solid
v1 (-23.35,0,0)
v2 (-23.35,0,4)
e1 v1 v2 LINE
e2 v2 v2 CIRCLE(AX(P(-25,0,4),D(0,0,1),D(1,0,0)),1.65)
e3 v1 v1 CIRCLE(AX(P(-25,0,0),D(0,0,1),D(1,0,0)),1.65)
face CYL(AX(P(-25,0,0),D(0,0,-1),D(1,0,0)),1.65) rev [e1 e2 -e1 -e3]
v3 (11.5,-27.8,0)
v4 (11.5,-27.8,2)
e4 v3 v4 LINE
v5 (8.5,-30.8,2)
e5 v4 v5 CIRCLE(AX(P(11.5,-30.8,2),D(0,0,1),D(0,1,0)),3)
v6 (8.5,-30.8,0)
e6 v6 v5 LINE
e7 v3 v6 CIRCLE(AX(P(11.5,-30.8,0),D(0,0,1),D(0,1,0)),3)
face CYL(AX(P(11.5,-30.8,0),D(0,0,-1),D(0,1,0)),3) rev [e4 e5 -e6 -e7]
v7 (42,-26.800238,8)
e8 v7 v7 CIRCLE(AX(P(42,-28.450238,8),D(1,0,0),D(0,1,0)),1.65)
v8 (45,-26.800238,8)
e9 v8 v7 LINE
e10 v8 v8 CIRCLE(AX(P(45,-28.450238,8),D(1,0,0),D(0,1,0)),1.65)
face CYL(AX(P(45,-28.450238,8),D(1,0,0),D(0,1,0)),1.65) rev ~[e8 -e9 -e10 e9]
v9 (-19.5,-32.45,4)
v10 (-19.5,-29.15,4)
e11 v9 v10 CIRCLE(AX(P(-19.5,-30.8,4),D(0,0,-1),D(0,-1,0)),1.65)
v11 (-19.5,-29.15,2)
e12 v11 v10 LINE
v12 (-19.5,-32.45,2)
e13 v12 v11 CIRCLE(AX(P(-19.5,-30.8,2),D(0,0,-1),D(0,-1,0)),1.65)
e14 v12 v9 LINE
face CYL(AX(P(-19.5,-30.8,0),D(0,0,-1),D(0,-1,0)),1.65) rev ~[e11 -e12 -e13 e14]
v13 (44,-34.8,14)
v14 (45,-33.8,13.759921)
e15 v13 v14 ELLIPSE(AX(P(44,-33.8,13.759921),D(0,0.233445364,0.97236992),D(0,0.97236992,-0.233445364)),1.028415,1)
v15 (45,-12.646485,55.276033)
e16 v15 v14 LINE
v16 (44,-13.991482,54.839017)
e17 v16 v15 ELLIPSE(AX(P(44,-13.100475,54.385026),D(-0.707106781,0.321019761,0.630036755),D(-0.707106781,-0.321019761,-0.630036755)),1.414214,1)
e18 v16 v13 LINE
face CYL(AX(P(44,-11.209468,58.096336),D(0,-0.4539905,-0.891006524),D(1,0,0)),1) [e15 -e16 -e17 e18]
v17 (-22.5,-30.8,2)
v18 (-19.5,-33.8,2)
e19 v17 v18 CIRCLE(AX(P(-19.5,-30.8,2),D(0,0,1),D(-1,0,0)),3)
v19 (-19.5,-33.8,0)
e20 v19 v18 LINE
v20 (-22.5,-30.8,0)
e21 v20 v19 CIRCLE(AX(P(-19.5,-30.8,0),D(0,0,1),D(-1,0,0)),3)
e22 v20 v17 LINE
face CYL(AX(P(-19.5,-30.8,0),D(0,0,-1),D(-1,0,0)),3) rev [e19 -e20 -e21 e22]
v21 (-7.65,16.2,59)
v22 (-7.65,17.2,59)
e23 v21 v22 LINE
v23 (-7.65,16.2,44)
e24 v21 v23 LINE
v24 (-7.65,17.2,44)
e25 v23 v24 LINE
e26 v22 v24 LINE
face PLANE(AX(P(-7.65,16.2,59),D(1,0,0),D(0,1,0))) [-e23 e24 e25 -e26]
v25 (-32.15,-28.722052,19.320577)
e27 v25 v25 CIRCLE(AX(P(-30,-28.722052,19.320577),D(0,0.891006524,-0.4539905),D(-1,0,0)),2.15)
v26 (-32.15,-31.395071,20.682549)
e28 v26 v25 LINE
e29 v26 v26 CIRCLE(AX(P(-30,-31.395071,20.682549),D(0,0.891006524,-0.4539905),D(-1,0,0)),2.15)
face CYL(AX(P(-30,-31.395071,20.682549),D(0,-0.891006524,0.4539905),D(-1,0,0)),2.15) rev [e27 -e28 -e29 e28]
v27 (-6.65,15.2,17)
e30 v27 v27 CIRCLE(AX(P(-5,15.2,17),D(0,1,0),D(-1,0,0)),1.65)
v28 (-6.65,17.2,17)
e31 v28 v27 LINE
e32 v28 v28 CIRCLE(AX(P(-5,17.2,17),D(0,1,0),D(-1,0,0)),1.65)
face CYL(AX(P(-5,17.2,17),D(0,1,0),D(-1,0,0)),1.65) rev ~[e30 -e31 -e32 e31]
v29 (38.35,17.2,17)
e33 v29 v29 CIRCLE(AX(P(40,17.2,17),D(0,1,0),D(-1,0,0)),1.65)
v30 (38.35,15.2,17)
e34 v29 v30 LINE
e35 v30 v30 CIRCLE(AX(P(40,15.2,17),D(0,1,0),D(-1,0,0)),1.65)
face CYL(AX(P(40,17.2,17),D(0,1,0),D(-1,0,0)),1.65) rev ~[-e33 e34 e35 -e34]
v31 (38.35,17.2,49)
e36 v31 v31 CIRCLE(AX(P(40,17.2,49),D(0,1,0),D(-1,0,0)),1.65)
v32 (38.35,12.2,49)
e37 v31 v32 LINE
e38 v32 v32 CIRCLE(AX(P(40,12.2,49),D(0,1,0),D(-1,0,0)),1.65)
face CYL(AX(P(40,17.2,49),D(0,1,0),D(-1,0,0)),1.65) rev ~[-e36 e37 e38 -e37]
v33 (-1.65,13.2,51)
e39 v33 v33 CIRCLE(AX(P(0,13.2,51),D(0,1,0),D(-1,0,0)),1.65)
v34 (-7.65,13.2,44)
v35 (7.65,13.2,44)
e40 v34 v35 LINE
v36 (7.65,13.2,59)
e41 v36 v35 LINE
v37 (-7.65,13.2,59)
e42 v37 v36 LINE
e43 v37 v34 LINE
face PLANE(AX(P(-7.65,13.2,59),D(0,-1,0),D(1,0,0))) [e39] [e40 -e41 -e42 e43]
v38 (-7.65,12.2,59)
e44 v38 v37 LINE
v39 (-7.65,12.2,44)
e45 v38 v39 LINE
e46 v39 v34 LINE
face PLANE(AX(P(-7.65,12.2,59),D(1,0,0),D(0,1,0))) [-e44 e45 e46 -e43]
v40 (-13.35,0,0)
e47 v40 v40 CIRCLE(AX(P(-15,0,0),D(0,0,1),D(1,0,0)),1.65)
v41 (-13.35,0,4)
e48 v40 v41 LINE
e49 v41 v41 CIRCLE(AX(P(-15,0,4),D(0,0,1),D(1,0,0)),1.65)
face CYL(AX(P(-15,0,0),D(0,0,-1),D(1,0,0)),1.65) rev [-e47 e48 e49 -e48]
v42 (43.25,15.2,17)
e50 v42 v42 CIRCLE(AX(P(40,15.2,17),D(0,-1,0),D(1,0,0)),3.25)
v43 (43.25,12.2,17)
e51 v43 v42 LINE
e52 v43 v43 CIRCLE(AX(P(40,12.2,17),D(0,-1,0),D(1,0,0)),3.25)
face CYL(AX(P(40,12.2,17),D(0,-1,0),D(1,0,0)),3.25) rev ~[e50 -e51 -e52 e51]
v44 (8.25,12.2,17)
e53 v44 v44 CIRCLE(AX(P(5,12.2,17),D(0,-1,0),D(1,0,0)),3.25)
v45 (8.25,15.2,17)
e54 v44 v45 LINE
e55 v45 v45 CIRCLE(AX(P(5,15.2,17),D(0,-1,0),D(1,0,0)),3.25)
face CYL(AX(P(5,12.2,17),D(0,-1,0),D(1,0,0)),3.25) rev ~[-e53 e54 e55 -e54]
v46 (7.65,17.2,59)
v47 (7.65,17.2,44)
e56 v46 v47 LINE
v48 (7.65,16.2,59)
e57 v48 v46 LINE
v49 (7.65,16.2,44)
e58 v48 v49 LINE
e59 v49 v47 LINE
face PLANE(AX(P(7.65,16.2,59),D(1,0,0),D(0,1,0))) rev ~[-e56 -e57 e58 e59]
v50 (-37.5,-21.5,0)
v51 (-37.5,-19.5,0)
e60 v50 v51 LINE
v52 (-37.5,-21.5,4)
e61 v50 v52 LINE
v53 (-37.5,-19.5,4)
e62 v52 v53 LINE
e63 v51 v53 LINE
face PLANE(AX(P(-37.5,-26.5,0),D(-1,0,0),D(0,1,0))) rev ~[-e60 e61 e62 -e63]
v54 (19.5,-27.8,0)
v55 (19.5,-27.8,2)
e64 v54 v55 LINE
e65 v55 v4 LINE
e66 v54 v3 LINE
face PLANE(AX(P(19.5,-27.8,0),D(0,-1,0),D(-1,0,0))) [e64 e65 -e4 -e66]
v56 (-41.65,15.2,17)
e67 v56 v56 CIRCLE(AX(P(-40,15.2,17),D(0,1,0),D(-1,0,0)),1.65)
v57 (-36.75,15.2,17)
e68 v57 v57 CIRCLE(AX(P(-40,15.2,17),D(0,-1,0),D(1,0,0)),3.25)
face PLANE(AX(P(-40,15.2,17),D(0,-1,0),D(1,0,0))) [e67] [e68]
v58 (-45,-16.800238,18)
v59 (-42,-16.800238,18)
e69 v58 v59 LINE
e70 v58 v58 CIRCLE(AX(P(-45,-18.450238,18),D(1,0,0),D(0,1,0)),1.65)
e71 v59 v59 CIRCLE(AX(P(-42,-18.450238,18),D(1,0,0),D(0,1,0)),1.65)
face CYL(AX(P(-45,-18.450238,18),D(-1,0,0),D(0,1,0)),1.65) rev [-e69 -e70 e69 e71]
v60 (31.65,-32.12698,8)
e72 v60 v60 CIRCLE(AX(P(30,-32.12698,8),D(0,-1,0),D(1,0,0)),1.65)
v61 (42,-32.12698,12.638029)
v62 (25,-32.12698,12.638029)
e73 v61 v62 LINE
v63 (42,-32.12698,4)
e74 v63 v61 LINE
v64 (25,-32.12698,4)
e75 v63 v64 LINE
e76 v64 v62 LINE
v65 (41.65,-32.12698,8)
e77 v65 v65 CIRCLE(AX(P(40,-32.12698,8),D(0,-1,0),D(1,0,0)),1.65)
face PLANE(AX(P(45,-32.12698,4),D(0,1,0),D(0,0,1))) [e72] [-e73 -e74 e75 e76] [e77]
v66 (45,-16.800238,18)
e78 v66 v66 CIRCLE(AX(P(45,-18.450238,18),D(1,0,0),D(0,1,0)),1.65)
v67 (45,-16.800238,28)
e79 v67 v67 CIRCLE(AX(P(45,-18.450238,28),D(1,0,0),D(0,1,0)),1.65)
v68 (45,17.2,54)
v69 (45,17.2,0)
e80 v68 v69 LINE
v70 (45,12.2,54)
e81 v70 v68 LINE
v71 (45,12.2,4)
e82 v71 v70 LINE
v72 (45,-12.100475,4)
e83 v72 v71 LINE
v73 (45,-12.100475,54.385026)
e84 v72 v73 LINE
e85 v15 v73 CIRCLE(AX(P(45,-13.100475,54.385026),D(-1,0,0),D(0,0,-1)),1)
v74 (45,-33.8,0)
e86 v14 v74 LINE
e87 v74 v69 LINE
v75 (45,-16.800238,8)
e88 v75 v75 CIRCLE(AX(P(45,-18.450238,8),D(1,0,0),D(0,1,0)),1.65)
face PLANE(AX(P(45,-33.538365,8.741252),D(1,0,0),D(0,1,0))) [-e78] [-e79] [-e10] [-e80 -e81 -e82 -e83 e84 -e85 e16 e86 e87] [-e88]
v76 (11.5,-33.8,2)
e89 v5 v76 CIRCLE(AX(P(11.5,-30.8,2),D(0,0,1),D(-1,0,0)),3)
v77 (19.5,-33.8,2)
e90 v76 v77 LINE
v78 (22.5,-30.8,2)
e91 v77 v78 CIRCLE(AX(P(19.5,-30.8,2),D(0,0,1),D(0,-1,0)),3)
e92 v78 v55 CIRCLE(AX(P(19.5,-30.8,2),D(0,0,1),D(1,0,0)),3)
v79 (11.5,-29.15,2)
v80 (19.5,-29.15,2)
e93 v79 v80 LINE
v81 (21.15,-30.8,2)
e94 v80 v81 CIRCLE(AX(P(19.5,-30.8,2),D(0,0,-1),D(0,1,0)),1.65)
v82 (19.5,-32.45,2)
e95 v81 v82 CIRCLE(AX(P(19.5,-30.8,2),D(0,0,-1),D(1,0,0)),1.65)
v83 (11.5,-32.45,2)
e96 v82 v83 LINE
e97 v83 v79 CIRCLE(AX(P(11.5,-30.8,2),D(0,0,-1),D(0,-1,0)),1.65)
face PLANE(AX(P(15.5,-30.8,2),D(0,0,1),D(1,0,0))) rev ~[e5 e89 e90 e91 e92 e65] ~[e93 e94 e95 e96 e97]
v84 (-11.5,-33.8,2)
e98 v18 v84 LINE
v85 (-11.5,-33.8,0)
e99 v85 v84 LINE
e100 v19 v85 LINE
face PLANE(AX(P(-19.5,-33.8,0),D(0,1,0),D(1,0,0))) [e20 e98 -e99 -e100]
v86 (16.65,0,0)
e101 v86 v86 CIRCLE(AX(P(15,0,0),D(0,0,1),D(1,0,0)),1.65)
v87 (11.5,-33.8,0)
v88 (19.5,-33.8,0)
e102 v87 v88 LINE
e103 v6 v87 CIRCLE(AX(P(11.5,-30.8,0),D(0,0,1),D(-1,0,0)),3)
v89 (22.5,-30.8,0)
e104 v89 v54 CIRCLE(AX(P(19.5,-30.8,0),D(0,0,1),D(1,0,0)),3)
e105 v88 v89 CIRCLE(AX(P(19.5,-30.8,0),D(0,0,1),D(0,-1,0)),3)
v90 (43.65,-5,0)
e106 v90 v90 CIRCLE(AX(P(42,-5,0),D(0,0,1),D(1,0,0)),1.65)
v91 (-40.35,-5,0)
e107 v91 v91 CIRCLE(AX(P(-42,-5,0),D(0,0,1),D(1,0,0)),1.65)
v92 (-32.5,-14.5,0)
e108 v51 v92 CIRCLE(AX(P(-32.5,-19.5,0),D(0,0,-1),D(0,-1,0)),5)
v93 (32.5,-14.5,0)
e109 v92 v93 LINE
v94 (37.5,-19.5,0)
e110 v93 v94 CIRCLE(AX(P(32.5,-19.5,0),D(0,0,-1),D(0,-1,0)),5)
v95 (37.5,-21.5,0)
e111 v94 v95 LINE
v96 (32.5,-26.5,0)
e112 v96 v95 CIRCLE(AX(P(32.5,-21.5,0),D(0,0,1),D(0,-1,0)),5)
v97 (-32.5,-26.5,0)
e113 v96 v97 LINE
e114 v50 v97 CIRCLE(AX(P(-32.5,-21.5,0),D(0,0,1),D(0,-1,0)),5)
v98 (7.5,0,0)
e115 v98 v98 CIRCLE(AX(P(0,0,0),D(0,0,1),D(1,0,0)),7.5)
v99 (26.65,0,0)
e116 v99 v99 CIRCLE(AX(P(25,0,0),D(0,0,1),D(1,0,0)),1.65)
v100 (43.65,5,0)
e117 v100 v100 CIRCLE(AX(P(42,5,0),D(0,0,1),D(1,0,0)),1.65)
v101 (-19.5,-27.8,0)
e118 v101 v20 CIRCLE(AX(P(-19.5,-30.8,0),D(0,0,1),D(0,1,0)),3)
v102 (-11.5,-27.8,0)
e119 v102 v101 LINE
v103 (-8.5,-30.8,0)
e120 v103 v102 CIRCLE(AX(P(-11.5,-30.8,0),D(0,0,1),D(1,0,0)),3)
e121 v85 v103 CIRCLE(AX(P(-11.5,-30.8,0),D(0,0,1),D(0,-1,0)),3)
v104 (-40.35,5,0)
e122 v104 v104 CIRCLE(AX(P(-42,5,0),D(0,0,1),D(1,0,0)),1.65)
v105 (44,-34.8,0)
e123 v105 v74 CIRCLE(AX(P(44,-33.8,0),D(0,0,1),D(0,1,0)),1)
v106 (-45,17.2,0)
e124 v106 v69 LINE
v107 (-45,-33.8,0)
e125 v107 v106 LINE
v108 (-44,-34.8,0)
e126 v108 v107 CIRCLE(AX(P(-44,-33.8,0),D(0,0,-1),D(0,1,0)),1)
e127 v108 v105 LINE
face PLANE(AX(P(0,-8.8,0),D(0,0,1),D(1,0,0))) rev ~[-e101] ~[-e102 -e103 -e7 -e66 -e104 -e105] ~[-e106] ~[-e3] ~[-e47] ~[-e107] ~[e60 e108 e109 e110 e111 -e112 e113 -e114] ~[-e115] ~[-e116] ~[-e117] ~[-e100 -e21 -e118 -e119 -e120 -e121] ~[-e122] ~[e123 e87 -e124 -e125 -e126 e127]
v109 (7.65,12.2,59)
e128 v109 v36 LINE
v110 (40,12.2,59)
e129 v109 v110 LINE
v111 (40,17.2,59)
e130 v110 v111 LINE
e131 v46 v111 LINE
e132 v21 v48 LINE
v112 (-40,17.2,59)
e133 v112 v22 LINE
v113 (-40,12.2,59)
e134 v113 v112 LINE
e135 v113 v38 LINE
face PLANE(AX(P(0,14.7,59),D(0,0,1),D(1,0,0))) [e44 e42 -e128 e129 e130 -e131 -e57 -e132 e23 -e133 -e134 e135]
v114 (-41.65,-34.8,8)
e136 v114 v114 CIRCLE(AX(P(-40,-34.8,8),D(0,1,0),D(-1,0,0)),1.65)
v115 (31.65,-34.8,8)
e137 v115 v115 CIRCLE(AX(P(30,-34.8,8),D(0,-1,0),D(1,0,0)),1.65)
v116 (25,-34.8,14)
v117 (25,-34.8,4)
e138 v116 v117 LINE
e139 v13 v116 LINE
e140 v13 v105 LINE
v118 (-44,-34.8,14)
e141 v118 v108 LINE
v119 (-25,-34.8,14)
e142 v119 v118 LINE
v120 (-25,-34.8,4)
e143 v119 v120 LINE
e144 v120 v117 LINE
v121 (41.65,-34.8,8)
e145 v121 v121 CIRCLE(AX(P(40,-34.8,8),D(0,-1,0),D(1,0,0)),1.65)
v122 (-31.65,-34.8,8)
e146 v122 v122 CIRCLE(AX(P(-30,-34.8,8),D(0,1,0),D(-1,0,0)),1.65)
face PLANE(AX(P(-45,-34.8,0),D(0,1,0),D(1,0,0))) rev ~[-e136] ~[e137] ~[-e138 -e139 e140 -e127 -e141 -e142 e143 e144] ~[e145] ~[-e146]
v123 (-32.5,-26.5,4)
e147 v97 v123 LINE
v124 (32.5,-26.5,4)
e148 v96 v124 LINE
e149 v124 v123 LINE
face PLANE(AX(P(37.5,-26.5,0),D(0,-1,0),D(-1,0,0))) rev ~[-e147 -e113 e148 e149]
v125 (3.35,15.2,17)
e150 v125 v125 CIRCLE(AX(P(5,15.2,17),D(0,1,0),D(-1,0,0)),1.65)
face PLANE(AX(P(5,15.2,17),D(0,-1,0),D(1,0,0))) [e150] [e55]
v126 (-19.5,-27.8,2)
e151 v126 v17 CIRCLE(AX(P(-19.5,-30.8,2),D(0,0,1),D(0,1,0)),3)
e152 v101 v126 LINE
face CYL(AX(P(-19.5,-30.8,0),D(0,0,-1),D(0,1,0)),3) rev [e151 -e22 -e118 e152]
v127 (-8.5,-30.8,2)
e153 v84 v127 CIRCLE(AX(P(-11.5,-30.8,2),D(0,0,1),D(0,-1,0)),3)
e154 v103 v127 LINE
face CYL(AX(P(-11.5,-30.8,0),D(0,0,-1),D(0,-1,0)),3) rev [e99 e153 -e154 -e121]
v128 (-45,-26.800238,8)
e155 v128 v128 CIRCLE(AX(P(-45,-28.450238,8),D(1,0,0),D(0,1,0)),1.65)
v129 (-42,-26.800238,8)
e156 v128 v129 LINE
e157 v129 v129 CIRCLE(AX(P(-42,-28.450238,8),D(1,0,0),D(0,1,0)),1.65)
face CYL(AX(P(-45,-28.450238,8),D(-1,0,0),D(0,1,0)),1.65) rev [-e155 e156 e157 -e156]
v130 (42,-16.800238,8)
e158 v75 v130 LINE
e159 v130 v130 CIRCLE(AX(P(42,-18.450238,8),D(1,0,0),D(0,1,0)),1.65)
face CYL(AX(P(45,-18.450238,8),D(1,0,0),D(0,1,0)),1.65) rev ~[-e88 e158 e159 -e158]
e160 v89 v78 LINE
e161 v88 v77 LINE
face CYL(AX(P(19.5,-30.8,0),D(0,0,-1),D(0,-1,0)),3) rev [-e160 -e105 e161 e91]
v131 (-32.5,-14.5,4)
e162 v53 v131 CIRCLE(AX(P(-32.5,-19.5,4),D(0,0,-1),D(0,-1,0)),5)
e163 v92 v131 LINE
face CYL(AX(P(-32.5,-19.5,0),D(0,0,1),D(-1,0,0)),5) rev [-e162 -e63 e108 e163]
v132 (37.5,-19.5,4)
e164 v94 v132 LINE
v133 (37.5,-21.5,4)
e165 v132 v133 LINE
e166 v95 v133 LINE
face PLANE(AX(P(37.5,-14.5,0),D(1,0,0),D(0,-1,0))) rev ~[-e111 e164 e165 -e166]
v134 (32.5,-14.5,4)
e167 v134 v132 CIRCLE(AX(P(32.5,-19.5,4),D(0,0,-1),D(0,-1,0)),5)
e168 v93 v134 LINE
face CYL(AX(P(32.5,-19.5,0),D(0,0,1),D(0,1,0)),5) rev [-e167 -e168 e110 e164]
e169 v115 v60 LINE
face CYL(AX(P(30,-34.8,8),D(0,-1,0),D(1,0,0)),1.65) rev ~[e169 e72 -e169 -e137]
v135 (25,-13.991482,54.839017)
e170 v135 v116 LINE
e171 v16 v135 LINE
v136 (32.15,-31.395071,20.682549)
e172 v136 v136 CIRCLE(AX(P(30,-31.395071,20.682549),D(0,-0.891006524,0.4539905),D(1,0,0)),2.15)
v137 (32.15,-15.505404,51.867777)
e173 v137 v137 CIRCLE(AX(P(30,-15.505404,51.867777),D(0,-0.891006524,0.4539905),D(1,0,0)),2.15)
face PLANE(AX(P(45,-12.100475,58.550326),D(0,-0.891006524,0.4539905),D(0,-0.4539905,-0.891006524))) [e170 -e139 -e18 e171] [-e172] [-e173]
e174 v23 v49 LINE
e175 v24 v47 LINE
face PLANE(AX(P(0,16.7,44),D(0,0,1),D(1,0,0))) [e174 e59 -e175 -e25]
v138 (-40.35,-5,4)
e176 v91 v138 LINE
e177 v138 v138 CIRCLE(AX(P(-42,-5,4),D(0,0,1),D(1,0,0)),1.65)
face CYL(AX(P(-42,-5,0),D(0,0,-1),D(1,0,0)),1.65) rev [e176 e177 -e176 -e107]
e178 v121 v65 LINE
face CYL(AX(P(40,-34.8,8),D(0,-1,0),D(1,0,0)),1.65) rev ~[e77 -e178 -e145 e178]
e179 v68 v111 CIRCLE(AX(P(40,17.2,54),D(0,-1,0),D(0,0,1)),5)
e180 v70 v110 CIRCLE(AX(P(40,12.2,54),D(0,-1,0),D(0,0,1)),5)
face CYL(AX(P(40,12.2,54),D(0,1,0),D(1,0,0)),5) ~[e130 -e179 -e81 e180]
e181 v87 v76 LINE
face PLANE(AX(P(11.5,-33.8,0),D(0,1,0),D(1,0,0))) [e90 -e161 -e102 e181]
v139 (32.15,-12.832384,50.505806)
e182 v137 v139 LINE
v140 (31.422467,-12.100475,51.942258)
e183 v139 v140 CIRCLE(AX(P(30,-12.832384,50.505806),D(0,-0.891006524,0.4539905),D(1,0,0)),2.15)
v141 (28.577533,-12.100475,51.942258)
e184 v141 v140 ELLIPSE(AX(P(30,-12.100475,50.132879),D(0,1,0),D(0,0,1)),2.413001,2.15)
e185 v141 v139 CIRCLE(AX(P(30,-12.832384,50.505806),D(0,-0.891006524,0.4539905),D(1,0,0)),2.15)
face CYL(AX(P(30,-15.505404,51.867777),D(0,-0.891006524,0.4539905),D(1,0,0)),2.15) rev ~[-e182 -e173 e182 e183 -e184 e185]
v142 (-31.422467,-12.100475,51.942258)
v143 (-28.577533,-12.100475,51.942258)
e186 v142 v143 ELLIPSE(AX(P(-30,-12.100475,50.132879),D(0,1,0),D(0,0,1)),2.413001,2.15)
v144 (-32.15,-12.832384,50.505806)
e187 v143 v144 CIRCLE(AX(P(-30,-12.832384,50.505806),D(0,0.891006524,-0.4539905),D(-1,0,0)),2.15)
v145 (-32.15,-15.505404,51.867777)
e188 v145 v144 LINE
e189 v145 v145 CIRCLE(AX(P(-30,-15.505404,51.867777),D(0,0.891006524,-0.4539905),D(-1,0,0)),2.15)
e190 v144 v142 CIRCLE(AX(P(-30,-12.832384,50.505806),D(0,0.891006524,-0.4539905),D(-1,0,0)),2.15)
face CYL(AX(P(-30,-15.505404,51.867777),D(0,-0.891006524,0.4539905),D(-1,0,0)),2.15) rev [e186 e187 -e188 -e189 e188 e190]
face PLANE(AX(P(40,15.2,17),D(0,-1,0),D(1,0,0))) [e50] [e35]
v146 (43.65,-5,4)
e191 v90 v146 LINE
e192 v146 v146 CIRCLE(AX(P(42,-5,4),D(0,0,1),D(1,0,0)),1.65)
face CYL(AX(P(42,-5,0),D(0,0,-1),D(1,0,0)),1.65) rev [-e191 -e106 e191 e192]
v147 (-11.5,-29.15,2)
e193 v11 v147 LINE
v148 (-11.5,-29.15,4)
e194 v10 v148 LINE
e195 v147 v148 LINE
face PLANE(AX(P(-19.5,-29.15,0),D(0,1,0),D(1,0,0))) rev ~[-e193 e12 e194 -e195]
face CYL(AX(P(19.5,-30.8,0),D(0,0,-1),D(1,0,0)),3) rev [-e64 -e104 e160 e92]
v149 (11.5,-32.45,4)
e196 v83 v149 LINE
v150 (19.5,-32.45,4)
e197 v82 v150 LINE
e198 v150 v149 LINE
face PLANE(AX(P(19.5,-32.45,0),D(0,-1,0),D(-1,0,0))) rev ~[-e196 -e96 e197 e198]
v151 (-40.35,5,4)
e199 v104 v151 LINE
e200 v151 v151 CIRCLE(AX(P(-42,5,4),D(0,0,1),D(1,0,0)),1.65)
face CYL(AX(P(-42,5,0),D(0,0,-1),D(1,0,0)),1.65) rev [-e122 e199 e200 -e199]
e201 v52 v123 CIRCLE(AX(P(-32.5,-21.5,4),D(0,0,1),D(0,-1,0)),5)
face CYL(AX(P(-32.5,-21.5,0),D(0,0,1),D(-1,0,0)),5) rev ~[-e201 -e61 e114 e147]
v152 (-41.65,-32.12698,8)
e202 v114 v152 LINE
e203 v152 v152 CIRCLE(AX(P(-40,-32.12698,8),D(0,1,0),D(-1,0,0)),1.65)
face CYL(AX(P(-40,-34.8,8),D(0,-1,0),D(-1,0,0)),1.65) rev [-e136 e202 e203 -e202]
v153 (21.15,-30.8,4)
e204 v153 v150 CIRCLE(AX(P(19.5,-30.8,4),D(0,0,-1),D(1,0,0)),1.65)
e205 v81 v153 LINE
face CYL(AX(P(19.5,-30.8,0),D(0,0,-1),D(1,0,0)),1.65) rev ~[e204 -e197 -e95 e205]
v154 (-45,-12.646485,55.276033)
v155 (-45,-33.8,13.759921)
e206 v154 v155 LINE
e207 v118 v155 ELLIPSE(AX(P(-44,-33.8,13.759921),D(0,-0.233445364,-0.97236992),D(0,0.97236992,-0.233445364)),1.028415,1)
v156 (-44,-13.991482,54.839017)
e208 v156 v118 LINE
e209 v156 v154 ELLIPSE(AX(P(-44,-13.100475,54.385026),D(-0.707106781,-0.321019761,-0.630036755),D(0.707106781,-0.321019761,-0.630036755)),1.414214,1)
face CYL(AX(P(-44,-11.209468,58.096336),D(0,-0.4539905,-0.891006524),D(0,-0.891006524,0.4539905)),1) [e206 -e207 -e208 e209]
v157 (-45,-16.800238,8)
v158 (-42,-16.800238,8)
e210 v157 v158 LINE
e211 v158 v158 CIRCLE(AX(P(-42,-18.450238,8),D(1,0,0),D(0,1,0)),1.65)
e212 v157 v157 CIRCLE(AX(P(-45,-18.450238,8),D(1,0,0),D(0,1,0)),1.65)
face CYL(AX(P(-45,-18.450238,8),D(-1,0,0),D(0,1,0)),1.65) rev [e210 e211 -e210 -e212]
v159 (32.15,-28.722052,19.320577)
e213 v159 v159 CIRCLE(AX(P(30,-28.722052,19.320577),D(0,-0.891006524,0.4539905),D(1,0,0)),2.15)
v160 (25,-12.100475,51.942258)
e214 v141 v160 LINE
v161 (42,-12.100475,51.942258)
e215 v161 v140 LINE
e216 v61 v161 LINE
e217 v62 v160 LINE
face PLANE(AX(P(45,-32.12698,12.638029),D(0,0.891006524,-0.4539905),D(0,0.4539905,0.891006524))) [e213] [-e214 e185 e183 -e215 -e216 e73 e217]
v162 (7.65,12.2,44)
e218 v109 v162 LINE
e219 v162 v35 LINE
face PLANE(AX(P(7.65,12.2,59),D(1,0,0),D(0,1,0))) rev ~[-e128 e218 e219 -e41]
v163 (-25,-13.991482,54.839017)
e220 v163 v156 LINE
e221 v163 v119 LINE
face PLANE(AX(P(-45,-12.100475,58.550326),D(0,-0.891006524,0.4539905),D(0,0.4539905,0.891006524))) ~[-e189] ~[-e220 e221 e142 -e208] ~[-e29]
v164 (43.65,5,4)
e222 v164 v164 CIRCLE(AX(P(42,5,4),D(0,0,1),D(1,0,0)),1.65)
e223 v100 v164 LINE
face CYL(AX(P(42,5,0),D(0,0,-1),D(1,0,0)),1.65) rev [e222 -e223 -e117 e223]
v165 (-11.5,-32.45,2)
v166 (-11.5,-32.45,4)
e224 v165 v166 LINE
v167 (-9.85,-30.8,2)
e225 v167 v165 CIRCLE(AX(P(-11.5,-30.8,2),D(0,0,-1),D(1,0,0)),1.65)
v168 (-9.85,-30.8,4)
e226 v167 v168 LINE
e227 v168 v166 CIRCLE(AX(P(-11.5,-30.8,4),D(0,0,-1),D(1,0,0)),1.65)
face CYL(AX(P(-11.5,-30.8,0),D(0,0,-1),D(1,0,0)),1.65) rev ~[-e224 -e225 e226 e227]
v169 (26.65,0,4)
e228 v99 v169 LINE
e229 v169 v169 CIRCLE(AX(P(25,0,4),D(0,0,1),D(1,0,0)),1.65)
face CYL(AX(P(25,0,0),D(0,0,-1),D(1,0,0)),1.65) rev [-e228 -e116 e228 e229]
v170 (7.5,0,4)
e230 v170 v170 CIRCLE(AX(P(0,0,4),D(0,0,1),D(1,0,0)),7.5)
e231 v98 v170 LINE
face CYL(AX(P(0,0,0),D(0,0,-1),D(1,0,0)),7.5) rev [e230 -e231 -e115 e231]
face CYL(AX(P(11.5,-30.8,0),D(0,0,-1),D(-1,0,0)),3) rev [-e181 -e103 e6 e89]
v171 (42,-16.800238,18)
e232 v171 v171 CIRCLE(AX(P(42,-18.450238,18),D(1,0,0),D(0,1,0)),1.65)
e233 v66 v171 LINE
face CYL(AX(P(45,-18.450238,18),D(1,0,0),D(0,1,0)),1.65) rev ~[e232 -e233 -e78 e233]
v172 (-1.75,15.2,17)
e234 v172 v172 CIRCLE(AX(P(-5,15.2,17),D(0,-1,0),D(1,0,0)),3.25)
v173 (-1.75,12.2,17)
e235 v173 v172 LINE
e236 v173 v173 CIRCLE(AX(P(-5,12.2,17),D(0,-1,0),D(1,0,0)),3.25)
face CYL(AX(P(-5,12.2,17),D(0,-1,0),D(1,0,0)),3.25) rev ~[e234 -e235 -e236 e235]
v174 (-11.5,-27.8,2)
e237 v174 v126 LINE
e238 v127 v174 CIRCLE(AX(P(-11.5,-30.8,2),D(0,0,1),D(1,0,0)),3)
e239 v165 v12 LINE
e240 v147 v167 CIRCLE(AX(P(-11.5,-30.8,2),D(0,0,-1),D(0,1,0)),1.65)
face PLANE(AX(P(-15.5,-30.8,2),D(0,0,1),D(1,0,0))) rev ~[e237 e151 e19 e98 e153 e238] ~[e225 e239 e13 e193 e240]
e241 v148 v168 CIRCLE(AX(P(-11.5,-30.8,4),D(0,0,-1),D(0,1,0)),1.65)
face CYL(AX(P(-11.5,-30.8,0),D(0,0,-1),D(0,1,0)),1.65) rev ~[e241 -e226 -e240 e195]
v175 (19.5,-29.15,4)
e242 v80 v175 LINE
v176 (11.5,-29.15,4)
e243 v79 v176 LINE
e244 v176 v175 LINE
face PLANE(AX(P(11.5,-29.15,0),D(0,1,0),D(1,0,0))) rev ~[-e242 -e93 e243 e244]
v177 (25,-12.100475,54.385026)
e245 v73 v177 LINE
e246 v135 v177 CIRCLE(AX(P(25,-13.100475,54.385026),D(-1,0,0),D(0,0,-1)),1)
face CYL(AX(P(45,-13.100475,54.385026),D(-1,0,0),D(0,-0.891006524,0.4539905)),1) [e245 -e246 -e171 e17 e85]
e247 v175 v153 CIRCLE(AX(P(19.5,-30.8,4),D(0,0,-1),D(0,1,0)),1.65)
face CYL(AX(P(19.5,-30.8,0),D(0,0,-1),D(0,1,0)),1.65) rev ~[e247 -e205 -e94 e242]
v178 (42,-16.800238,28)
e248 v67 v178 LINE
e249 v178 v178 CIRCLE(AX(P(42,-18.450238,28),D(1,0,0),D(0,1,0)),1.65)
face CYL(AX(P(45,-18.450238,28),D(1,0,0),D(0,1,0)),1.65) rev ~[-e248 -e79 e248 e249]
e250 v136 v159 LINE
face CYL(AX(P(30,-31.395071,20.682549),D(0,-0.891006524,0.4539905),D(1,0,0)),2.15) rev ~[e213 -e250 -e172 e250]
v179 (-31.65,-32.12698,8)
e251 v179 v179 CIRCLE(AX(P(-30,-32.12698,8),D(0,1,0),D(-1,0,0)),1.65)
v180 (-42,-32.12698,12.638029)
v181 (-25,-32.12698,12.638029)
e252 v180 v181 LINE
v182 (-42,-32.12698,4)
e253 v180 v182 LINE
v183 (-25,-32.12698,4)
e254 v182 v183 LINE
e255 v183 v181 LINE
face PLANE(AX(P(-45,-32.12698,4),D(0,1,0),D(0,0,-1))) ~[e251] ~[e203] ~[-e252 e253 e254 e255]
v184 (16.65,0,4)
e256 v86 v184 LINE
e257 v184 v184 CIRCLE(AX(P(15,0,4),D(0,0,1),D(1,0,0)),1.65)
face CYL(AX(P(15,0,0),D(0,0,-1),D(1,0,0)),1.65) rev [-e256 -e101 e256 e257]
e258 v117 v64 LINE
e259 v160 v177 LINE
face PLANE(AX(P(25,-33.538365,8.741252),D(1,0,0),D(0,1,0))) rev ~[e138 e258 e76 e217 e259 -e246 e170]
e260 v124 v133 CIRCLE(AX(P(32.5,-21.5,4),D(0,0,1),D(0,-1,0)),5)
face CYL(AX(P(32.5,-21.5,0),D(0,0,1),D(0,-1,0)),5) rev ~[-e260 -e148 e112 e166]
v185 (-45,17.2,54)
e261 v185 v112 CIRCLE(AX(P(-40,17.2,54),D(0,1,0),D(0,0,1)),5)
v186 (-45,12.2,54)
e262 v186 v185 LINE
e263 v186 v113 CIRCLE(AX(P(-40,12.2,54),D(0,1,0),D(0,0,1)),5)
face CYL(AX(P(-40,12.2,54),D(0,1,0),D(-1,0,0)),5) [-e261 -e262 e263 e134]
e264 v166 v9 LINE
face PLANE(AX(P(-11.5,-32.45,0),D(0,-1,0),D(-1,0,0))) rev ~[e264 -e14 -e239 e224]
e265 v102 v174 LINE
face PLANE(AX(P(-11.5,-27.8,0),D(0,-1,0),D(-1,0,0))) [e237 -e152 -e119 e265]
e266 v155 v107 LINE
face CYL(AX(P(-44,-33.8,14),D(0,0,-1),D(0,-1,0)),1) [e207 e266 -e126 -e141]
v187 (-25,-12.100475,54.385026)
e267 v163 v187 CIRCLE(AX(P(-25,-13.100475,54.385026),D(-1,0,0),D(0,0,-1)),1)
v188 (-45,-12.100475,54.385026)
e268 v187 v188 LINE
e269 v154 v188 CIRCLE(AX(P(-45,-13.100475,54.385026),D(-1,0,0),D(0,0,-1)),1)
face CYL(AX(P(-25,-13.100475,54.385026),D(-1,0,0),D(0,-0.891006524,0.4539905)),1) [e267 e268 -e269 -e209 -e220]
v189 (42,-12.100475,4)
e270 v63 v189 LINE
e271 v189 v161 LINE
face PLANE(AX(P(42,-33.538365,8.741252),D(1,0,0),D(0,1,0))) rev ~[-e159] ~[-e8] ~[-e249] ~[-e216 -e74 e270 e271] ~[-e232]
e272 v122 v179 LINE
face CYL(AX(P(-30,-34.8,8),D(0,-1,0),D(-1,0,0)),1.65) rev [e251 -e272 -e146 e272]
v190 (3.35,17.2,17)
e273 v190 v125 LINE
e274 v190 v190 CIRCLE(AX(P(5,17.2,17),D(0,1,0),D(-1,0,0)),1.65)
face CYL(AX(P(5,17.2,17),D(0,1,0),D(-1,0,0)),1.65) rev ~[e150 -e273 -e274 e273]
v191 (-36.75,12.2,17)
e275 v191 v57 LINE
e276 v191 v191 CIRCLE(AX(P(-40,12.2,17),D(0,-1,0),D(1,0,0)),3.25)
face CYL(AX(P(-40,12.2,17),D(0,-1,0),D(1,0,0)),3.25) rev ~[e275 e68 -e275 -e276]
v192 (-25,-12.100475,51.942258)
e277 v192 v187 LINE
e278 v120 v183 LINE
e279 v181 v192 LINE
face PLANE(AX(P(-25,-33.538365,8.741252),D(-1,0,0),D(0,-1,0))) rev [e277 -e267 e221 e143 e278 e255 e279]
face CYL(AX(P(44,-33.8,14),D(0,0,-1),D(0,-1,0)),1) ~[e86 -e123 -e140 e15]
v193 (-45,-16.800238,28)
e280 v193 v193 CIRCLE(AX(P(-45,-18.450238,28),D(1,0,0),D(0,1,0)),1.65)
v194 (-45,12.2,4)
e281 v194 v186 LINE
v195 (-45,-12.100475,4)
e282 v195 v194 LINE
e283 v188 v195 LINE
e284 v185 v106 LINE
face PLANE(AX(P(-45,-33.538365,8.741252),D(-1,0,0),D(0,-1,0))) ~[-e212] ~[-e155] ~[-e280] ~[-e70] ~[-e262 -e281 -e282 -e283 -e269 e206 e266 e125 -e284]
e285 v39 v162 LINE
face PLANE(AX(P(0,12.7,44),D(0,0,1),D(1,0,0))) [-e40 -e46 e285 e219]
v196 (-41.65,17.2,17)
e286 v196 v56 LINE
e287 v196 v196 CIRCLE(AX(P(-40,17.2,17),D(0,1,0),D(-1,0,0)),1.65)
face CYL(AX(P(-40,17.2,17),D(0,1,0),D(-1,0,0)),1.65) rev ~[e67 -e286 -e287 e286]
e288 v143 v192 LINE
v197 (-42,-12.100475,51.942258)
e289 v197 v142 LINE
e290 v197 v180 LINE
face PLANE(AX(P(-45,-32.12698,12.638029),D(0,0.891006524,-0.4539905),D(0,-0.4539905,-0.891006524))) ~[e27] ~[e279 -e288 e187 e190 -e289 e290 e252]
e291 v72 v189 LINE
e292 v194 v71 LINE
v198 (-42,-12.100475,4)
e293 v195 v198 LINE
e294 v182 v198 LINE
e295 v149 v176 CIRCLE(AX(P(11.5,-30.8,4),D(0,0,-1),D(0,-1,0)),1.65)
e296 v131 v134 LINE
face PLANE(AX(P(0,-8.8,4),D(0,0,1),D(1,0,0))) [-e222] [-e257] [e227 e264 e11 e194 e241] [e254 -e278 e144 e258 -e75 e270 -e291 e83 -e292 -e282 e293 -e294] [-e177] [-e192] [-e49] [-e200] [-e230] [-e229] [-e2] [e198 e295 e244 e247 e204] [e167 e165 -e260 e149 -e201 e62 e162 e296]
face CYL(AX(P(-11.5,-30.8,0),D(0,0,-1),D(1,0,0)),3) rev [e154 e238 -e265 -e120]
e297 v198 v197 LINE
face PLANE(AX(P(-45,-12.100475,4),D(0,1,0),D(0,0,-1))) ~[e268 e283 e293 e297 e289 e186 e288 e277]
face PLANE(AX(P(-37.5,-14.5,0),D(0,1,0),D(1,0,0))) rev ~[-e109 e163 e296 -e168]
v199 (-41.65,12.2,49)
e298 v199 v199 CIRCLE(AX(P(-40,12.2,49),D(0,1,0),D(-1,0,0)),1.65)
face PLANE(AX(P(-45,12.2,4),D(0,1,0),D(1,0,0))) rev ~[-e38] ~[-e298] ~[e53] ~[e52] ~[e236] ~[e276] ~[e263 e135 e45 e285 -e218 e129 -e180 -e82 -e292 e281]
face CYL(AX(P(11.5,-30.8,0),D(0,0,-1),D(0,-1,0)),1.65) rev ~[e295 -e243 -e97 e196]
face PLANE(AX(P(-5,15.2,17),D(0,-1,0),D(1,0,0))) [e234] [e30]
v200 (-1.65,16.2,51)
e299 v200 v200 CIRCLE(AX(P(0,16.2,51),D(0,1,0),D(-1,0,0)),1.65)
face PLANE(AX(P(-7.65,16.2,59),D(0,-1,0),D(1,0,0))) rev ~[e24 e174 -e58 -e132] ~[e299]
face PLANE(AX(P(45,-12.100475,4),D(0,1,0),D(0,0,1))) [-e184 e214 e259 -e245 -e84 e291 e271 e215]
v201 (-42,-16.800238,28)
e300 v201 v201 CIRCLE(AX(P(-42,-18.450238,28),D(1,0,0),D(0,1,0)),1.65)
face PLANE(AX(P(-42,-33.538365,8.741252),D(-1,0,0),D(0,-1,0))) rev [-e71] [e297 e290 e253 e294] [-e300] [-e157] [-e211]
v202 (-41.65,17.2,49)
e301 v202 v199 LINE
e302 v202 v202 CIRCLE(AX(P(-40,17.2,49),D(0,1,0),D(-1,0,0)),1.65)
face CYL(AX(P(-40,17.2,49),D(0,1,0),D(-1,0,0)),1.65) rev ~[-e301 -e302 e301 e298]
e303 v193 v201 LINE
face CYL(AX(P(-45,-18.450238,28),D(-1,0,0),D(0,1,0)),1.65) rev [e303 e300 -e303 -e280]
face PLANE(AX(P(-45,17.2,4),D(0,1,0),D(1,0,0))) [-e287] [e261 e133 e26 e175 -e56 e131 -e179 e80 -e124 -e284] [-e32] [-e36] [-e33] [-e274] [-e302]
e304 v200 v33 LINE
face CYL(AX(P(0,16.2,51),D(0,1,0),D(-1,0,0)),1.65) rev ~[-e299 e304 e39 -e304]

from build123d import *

# Parameters (mm, degrees)
F0_W      = 90
F0_H      = 52
F0_R      = 1.65
F0_R_2    = 7.5
F0_W_2    = 2.5
F0_H_2    = 10
F1_DEPTH  = 4
F2_DEPTH  = 3
F3_W      = 90
F3_H      = 5
F4_DEPTH  = 55
F5_W      = 15.3
F5_H      = 1
F6_DEPTH  = 15
F7_R      = 1.65
F8_DEPTH  = 3
F9_R      = 1.65
F10_DEPTH = 5
F11_R     = 3.25
F12_DEPTH = 3
F14_DEPTH = 2
F16_DEPTH = 3
F17_DEPTH = 20
F18_R     = 2.15
F19_DEPTH = 3
F20_R     = 1.65
F21_DEPTH = 2.6730195726
F22_R     = 1.65
F23_DEPTH = 3
F24_R     = 1
F25_R     = 5


# Not quite as in the source:
# - a pattern or mirror of a feature is missing from the dataset's text; its kind, count and spacing are read off the source's solid
# - a feature names something its author has since deleted; it is built from what else it names


with BuildPart() as f1:
    # F0 (on Top) → F1 (new body)
    with BuildSketch(Plane.XY):
        with Locations((0, -8.8)):
            Rectangle(F0_W, F0_H)
        with BuildLine():
            ThreePointArc((-19.5, -32.45), (-21.15, -30.8), (-19.5, -29.15))
            Line((-19.5, -29.15), (-11.5, -29.15))
            ThreePointArc((-11.5, -29.15), (-10.333273811, -29.633273811), (-9.85, -30.8))
            ThreePointArc((-9.85, -30.8), (-10.333273811, -31.966726189), (-11.5, -32.45))
            Line((-11.5, -32.45), (-19.5, -32.45))
        make_face(mode=Mode.SUBTRACT)
        with BuildLine():
            ThreePointArc((19.5, -29.15), (20.666726189, -29.633273811), (21.15, -30.8))
            ThreePointArc((21.15, -30.8), (20.666726189, -31.966726189), (19.5, -32.45))
            Line((19.5, -32.45), (11.5, -32.45))
            ThreePointArc((11.5, -32.45), (9.85, -30.8), (11.5, -29.15))
            Line((11.5, -29.15), (19.5, -29.15))
        make_face(mode=Mode.SUBTRACT)
        Polygon((-35, -2), (-35, -12), (35, -12), (35, -2), (37.5, -2), (37.5, -12), (37.5, -14.5), (37.5, -26.5), (-37.5, -26.5), (-37.5, -14.5), (-37.5, -12), (-37.5, -2), align=None, mode=Mode.SUBTRACT)
        with Locations((-42, -5)):
            Circle(F0_R, mode=Mode.SUBTRACT)
        with Locations((-25, 0)):
            Circle(F0_R, mode=Mode.SUBTRACT)
        with Locations((-15, 0)):
            Circle(F0_R, mode=Mode.SUBTRACT)
        with Locations((-42, 5)):
            Circle(F0_R, mode=Mode.SUBTRACT)
        Circle(F0_R_2, mode=Mode.SUBTRACT)
        with Locations((15, 0)):
            Circle(F0_R, mode=Mode.SUBTRACT)
        with Locations((42, -5)):
            Circle(F0_R, mode=Mode.SUBTRACT)
        with Locations((25, 0)):
            Circle(F0_R, mode=Mode.SUBTRACT)
        with Locations((42, 5)):
            Circle(F0_R, mode=Mode.SUBTRACT)
        Polygon((35, -12), (-35, -12), (-37.5, -12), (-37.5, -14.5), (37.5, -14.5), (37.5, -12), align=None)
        with Locations((-36.25, -7)):
            Rectangle(F0_W_2, F0_H_2)
        with Locations((36.25, -7)):
            Rectangle(F0_W_2, F0_H_2)
    extrude(amount=F1_DEPTH)

    # F0 (on Top) → F2 (join)
    with BuildSketch(Plane.XY):
        with Locations((-36.25, -7)):
            Rectangle(F0_W_2, F0_H_2)
        with Locations((36.25, -7)):
            Rectangle(F0_W_2, F0_H_2)
    extrude(amount=F2_DEPTH)

    # F3 (on face) → F4 (join)
    with BuildSketch(Plane.XY.offset(4)):
        with Locations((0, 14.7)):
            Rectangle(F3_W, F3_H)
    extrude(amount=F4_DEPTH)

    # F5 (on face) → F6 (cut)
    with BuildSketch(Plane.XY.offset(59)):
        with Locations((0, 16.7)):
            Rectangle(F5_W, F5_H)
        with Locations((0, 12.7)):
            Rectangle(F5_W, F5_H)
    extrude(amount=-F6_DEPTH, mode=Mode.SUBTRACT)

    # F7 (on face) → F8 (cut, through all)
    with BuildSketch(Plane(origin=(0, 16.2, 0), x_dir=(-1, 0, 0), z_dir=(0, 1, 0))):
        with Locations((0, 51)):
            Circle(F7_R)
    extrude(amount=-F8_DEPTH, mode=Mode.SUBTRACT)

    # F9 (on face) → F10 (cut, through all)
    with BuildSketch(Plane(origin=(0, 17.2, 0), x_dir=(-1, 0, 0), z_dir=(0, 1, 0))):
        with Locations((-40, 17)):
            Circle(F9_R)
        with Locations((-5, 17)):
            Circle(F9_R)
        with Locations((40, 17)):
            Circle(F9_R)
        with Locations((5, 17)):
            Circle(F9_R)
        with Locations((-40, 49)):
            Circle(F9_R)
        with Locations((40, 49)):
            Circle(F9_R)
    extrude(amount=-F10_DEPTH, mode=Mode.SUBTRACT)

    # F11 (on face) → F12 (cut)
    with BuildSketch(Plane.XZ.offset(-12.2)):
        with Locations((5, 17)):
            Circle(F11_R)
        with Locations((40, 17)):
            Circle(F11_R)
        with Locations((-5, 17)):
            Circle(F11_R)
        with Locations((-40, 17)):
            Circle(F11_R)
    extrude(amount=-F12_DEPTH, mode=Mode.SUBTRACT)

    # F13 (on face) → F14 (cut)
    with BuildSketch(Plane.XY):
        with BuildLine():
            ThreePointArc((-22.5, -30.8), (-21.6213203436, -32.9213203436), (-19.5, -33.8))
            Line((-19.5, -33.8), (-11.5, -33.8))
            ThreePointArc((-11.5, -33.8), (-9.3786796564, -32.9213203436), (-8.5, -30.8))
            ThreePointArc((-8.5, -30.8), (-9.3786796564, -28.6786796564), (-11.5, -27.8))
            Line((-11.5, -27.8), (-19.5, -27.8))
            ThreePointArc((-19.5, -27.8), (-21.6213203436, -28.6786796564), (-22.5, -30.8))
        make_face()
        with BuildLine():
            Line((-11.5, -32.45), (-19.5, -32.45))
            ThreePointArc((-19.5, -32.45), (-21.15, -30.8), (-19.5, -29.15))
            Line((-19.5, -29.15), (-11.5, -29.15))
            ThreePointArc((-11.5, -29.15), (-10.333273811, -29.633273811), (-9.85, -30.8))
            ThreePointArc((-9.85, -30.8), (-10.333273811, -31.966726189), (-11.5, -32.45))
        make_face(mode=Mode.SUBTRACT)
        with BuildLine():
            ThreePointArc((8.5, -30.8), (9.3786796564, -32.9213203436), (11.5, -33.8))
            Line((11.5, -33.8), (19.5, -33.8))
            ThreePointArc((19.5, -33.8), (21.6213203436, -32.9213203436), (22.5, -30.8))
            ThreePointArc((22.5, -30.8), (21.6213203436, -28.6786796564), (19.5, -27.8))
            Line((19.5, -27.8), (11.5, -27.8))
            ThreePointArc((11.5, -27.8), (9.3786796564, -28.6786796564), (8.5, -30.8))
        make_face()
        with BuildLine():
            Line((11.5, -29.15), (19.5, -29.15))
            ThreePointArc((19.5, -29.15), (20.666726189, -29.633273811), (21.15, -30.8))
            ThreePointArc((21.15, -30.8), (20.666726189, -31.966726189), (19.5, -32.45))
            Line((19.5, -32.45), (11.5, -32.45))
            ThreePointArc((11.5, -32.45), (9.85, -30.8), (11.5, -29.15))
        make_face(mode=Mode.SUBTRACT)
    extrude(amount=F14_DEPTH, mode=Mode.SUBTRACT)

    # F15 (on face) → F16 (join)
    with BuildSketch(Plane.YZ.offset(45)):
        Polygon((-34.8, 14), (-34.8, 4), (-32.1269804274, 4), (-32.1269804274, 12.6380285008), align=None)
        Polygon((-12.100475013, 58.5503262094), (-34.8, 14), (-32.1269804274, 12.6380285008), (-12.100475013, 51.9422584157), align=None)
        Polygon((-32.1269804274, 12.6380285008), (-32.1269804274, 4), (-12.100475013, 4), (-12.100475013, 51.9422584157), align=None)
    f16 = extrude(amount=-F16_DEPTH)

    # F16_copies: F16 across plane
    add(f16.mirror(Plane(origin=(0, 0, 0), x_dir=(0, 0, -1), z_dir=(-1, 0, 0))))

    # F15 (on face) → F17 (join)
    with BuildSketch(Plane.YZ.offset(45)):
        Polygon((-34.8, 14), (-34.8, 4), (-32.1269804274, 4), (-32.1269804274, 12.6380285008), align=None)
        Polygon((-12.100475013, 58.5503262094), (-34.8, 14), (-32.1269804274, 12.6380285008), (-12.100475013, 51.9422584157), align=None)
    f17 = extrude(amount=-F17_DEPTH)

    # F17_copies: F17 across plane
    add(f17.mirror(Plane(origin=(0, 0, 0), x_dir=(0, 0, -1), z_dir=(-1, 0, 0))))

    # F18 (on face) → F19 (cut, through all)
    with BuildSketch(Plane(origin=(0, -33.2905823505, 16.9623989361), x_dir=(1, 0, 0), z_dir=(0, -0.8910065242, 0.4539904997))):
        with Locations((30, 4.1752219477)):
            Circle(F18_R)
        with Locations((30, 39.1752219477)):
            Circle(F18_R)
    f19 = extrude(amount=-F19_DEPTH, mode=Mode.SUBTRACT)

    # F19_copies: F19 across plane
    add(f19.mirror(Plane(origin=(0, 0, 0), x_dir=(0, 0, -1), z_dir=(-1, 0, 0))), mode=Mode.SUBTRACT)

    # F20 (on face) → F21 (cut, through all)
    with BuildSketch(Plane.XZ.offset(34.8)):
        with Locations((40, 8)):
            Circle(F20_R)
        with Locations((30, 8)):
            Circle(F20_R)
    f21 = extrude(amount=-F21_DEPTH, mode=Mode.SUBTRACT)

    # F21_copies: F21 across plane
    add(f21.mirror(Plane(origin=(0, 0, 0), x_dir=(0, 0, -1), z_dir=(-1, 0, 0))), mode=Mode.SUBTRACT)

    # F22 (on face) → F23 (cut, through all)
    with BuildSketch(Plane.YZ.offset(45)):
        with Locations((-28.4502375065, 8)):
            Circle(F22_R)
        with Locations((-18.4502375065, 8)):
            Circle(F22_R)
        with Locations((-18.4502375065, 18)):
            Circle(F22_R)
        with Locations((-18.4502375065, 28)):
            Circle(F22_R)
    f23 = extrude(amount=-F23_DEPTH, mode=Mode.SUBTRACT)

    # F23_copies: F23 across plane
    add(f23.mirror(Plane(origin=(0, 0, 0), x_dir=(0, 0, -1), z_dir=(-1, 0, 0))), mode=Mode.SUBTRACT)

    # F24
    f24_edges = [f1.edges().sort_by_distance(p)[0] for p in [
        (35, -12.100475, 58.550326),
        (45, -34.8, 7),
        (45, -23.450238, 36.275163),
        (-45, -34.8, 7),
        (-45, -23.450238, 36.275163),
        (-35, -12.100475, 58.550326),
    ]]
    fillet(f24_edges, radius=F24_R)

    # F25
    f25_edges = [f1.edges().sort_by_distance(p)[0] for p in [
        (45, 14.7, 59),
        (-45, 14.7, 59),
        (37.5, -26.5, 2),
        (37.5, -14.5, 2),
        (-37.5, -14.5, 2),
        (-37.5, -26.5, 2),
    ]]
    fillet(f25_edges, radius=F25_R)


solid = f1.part
